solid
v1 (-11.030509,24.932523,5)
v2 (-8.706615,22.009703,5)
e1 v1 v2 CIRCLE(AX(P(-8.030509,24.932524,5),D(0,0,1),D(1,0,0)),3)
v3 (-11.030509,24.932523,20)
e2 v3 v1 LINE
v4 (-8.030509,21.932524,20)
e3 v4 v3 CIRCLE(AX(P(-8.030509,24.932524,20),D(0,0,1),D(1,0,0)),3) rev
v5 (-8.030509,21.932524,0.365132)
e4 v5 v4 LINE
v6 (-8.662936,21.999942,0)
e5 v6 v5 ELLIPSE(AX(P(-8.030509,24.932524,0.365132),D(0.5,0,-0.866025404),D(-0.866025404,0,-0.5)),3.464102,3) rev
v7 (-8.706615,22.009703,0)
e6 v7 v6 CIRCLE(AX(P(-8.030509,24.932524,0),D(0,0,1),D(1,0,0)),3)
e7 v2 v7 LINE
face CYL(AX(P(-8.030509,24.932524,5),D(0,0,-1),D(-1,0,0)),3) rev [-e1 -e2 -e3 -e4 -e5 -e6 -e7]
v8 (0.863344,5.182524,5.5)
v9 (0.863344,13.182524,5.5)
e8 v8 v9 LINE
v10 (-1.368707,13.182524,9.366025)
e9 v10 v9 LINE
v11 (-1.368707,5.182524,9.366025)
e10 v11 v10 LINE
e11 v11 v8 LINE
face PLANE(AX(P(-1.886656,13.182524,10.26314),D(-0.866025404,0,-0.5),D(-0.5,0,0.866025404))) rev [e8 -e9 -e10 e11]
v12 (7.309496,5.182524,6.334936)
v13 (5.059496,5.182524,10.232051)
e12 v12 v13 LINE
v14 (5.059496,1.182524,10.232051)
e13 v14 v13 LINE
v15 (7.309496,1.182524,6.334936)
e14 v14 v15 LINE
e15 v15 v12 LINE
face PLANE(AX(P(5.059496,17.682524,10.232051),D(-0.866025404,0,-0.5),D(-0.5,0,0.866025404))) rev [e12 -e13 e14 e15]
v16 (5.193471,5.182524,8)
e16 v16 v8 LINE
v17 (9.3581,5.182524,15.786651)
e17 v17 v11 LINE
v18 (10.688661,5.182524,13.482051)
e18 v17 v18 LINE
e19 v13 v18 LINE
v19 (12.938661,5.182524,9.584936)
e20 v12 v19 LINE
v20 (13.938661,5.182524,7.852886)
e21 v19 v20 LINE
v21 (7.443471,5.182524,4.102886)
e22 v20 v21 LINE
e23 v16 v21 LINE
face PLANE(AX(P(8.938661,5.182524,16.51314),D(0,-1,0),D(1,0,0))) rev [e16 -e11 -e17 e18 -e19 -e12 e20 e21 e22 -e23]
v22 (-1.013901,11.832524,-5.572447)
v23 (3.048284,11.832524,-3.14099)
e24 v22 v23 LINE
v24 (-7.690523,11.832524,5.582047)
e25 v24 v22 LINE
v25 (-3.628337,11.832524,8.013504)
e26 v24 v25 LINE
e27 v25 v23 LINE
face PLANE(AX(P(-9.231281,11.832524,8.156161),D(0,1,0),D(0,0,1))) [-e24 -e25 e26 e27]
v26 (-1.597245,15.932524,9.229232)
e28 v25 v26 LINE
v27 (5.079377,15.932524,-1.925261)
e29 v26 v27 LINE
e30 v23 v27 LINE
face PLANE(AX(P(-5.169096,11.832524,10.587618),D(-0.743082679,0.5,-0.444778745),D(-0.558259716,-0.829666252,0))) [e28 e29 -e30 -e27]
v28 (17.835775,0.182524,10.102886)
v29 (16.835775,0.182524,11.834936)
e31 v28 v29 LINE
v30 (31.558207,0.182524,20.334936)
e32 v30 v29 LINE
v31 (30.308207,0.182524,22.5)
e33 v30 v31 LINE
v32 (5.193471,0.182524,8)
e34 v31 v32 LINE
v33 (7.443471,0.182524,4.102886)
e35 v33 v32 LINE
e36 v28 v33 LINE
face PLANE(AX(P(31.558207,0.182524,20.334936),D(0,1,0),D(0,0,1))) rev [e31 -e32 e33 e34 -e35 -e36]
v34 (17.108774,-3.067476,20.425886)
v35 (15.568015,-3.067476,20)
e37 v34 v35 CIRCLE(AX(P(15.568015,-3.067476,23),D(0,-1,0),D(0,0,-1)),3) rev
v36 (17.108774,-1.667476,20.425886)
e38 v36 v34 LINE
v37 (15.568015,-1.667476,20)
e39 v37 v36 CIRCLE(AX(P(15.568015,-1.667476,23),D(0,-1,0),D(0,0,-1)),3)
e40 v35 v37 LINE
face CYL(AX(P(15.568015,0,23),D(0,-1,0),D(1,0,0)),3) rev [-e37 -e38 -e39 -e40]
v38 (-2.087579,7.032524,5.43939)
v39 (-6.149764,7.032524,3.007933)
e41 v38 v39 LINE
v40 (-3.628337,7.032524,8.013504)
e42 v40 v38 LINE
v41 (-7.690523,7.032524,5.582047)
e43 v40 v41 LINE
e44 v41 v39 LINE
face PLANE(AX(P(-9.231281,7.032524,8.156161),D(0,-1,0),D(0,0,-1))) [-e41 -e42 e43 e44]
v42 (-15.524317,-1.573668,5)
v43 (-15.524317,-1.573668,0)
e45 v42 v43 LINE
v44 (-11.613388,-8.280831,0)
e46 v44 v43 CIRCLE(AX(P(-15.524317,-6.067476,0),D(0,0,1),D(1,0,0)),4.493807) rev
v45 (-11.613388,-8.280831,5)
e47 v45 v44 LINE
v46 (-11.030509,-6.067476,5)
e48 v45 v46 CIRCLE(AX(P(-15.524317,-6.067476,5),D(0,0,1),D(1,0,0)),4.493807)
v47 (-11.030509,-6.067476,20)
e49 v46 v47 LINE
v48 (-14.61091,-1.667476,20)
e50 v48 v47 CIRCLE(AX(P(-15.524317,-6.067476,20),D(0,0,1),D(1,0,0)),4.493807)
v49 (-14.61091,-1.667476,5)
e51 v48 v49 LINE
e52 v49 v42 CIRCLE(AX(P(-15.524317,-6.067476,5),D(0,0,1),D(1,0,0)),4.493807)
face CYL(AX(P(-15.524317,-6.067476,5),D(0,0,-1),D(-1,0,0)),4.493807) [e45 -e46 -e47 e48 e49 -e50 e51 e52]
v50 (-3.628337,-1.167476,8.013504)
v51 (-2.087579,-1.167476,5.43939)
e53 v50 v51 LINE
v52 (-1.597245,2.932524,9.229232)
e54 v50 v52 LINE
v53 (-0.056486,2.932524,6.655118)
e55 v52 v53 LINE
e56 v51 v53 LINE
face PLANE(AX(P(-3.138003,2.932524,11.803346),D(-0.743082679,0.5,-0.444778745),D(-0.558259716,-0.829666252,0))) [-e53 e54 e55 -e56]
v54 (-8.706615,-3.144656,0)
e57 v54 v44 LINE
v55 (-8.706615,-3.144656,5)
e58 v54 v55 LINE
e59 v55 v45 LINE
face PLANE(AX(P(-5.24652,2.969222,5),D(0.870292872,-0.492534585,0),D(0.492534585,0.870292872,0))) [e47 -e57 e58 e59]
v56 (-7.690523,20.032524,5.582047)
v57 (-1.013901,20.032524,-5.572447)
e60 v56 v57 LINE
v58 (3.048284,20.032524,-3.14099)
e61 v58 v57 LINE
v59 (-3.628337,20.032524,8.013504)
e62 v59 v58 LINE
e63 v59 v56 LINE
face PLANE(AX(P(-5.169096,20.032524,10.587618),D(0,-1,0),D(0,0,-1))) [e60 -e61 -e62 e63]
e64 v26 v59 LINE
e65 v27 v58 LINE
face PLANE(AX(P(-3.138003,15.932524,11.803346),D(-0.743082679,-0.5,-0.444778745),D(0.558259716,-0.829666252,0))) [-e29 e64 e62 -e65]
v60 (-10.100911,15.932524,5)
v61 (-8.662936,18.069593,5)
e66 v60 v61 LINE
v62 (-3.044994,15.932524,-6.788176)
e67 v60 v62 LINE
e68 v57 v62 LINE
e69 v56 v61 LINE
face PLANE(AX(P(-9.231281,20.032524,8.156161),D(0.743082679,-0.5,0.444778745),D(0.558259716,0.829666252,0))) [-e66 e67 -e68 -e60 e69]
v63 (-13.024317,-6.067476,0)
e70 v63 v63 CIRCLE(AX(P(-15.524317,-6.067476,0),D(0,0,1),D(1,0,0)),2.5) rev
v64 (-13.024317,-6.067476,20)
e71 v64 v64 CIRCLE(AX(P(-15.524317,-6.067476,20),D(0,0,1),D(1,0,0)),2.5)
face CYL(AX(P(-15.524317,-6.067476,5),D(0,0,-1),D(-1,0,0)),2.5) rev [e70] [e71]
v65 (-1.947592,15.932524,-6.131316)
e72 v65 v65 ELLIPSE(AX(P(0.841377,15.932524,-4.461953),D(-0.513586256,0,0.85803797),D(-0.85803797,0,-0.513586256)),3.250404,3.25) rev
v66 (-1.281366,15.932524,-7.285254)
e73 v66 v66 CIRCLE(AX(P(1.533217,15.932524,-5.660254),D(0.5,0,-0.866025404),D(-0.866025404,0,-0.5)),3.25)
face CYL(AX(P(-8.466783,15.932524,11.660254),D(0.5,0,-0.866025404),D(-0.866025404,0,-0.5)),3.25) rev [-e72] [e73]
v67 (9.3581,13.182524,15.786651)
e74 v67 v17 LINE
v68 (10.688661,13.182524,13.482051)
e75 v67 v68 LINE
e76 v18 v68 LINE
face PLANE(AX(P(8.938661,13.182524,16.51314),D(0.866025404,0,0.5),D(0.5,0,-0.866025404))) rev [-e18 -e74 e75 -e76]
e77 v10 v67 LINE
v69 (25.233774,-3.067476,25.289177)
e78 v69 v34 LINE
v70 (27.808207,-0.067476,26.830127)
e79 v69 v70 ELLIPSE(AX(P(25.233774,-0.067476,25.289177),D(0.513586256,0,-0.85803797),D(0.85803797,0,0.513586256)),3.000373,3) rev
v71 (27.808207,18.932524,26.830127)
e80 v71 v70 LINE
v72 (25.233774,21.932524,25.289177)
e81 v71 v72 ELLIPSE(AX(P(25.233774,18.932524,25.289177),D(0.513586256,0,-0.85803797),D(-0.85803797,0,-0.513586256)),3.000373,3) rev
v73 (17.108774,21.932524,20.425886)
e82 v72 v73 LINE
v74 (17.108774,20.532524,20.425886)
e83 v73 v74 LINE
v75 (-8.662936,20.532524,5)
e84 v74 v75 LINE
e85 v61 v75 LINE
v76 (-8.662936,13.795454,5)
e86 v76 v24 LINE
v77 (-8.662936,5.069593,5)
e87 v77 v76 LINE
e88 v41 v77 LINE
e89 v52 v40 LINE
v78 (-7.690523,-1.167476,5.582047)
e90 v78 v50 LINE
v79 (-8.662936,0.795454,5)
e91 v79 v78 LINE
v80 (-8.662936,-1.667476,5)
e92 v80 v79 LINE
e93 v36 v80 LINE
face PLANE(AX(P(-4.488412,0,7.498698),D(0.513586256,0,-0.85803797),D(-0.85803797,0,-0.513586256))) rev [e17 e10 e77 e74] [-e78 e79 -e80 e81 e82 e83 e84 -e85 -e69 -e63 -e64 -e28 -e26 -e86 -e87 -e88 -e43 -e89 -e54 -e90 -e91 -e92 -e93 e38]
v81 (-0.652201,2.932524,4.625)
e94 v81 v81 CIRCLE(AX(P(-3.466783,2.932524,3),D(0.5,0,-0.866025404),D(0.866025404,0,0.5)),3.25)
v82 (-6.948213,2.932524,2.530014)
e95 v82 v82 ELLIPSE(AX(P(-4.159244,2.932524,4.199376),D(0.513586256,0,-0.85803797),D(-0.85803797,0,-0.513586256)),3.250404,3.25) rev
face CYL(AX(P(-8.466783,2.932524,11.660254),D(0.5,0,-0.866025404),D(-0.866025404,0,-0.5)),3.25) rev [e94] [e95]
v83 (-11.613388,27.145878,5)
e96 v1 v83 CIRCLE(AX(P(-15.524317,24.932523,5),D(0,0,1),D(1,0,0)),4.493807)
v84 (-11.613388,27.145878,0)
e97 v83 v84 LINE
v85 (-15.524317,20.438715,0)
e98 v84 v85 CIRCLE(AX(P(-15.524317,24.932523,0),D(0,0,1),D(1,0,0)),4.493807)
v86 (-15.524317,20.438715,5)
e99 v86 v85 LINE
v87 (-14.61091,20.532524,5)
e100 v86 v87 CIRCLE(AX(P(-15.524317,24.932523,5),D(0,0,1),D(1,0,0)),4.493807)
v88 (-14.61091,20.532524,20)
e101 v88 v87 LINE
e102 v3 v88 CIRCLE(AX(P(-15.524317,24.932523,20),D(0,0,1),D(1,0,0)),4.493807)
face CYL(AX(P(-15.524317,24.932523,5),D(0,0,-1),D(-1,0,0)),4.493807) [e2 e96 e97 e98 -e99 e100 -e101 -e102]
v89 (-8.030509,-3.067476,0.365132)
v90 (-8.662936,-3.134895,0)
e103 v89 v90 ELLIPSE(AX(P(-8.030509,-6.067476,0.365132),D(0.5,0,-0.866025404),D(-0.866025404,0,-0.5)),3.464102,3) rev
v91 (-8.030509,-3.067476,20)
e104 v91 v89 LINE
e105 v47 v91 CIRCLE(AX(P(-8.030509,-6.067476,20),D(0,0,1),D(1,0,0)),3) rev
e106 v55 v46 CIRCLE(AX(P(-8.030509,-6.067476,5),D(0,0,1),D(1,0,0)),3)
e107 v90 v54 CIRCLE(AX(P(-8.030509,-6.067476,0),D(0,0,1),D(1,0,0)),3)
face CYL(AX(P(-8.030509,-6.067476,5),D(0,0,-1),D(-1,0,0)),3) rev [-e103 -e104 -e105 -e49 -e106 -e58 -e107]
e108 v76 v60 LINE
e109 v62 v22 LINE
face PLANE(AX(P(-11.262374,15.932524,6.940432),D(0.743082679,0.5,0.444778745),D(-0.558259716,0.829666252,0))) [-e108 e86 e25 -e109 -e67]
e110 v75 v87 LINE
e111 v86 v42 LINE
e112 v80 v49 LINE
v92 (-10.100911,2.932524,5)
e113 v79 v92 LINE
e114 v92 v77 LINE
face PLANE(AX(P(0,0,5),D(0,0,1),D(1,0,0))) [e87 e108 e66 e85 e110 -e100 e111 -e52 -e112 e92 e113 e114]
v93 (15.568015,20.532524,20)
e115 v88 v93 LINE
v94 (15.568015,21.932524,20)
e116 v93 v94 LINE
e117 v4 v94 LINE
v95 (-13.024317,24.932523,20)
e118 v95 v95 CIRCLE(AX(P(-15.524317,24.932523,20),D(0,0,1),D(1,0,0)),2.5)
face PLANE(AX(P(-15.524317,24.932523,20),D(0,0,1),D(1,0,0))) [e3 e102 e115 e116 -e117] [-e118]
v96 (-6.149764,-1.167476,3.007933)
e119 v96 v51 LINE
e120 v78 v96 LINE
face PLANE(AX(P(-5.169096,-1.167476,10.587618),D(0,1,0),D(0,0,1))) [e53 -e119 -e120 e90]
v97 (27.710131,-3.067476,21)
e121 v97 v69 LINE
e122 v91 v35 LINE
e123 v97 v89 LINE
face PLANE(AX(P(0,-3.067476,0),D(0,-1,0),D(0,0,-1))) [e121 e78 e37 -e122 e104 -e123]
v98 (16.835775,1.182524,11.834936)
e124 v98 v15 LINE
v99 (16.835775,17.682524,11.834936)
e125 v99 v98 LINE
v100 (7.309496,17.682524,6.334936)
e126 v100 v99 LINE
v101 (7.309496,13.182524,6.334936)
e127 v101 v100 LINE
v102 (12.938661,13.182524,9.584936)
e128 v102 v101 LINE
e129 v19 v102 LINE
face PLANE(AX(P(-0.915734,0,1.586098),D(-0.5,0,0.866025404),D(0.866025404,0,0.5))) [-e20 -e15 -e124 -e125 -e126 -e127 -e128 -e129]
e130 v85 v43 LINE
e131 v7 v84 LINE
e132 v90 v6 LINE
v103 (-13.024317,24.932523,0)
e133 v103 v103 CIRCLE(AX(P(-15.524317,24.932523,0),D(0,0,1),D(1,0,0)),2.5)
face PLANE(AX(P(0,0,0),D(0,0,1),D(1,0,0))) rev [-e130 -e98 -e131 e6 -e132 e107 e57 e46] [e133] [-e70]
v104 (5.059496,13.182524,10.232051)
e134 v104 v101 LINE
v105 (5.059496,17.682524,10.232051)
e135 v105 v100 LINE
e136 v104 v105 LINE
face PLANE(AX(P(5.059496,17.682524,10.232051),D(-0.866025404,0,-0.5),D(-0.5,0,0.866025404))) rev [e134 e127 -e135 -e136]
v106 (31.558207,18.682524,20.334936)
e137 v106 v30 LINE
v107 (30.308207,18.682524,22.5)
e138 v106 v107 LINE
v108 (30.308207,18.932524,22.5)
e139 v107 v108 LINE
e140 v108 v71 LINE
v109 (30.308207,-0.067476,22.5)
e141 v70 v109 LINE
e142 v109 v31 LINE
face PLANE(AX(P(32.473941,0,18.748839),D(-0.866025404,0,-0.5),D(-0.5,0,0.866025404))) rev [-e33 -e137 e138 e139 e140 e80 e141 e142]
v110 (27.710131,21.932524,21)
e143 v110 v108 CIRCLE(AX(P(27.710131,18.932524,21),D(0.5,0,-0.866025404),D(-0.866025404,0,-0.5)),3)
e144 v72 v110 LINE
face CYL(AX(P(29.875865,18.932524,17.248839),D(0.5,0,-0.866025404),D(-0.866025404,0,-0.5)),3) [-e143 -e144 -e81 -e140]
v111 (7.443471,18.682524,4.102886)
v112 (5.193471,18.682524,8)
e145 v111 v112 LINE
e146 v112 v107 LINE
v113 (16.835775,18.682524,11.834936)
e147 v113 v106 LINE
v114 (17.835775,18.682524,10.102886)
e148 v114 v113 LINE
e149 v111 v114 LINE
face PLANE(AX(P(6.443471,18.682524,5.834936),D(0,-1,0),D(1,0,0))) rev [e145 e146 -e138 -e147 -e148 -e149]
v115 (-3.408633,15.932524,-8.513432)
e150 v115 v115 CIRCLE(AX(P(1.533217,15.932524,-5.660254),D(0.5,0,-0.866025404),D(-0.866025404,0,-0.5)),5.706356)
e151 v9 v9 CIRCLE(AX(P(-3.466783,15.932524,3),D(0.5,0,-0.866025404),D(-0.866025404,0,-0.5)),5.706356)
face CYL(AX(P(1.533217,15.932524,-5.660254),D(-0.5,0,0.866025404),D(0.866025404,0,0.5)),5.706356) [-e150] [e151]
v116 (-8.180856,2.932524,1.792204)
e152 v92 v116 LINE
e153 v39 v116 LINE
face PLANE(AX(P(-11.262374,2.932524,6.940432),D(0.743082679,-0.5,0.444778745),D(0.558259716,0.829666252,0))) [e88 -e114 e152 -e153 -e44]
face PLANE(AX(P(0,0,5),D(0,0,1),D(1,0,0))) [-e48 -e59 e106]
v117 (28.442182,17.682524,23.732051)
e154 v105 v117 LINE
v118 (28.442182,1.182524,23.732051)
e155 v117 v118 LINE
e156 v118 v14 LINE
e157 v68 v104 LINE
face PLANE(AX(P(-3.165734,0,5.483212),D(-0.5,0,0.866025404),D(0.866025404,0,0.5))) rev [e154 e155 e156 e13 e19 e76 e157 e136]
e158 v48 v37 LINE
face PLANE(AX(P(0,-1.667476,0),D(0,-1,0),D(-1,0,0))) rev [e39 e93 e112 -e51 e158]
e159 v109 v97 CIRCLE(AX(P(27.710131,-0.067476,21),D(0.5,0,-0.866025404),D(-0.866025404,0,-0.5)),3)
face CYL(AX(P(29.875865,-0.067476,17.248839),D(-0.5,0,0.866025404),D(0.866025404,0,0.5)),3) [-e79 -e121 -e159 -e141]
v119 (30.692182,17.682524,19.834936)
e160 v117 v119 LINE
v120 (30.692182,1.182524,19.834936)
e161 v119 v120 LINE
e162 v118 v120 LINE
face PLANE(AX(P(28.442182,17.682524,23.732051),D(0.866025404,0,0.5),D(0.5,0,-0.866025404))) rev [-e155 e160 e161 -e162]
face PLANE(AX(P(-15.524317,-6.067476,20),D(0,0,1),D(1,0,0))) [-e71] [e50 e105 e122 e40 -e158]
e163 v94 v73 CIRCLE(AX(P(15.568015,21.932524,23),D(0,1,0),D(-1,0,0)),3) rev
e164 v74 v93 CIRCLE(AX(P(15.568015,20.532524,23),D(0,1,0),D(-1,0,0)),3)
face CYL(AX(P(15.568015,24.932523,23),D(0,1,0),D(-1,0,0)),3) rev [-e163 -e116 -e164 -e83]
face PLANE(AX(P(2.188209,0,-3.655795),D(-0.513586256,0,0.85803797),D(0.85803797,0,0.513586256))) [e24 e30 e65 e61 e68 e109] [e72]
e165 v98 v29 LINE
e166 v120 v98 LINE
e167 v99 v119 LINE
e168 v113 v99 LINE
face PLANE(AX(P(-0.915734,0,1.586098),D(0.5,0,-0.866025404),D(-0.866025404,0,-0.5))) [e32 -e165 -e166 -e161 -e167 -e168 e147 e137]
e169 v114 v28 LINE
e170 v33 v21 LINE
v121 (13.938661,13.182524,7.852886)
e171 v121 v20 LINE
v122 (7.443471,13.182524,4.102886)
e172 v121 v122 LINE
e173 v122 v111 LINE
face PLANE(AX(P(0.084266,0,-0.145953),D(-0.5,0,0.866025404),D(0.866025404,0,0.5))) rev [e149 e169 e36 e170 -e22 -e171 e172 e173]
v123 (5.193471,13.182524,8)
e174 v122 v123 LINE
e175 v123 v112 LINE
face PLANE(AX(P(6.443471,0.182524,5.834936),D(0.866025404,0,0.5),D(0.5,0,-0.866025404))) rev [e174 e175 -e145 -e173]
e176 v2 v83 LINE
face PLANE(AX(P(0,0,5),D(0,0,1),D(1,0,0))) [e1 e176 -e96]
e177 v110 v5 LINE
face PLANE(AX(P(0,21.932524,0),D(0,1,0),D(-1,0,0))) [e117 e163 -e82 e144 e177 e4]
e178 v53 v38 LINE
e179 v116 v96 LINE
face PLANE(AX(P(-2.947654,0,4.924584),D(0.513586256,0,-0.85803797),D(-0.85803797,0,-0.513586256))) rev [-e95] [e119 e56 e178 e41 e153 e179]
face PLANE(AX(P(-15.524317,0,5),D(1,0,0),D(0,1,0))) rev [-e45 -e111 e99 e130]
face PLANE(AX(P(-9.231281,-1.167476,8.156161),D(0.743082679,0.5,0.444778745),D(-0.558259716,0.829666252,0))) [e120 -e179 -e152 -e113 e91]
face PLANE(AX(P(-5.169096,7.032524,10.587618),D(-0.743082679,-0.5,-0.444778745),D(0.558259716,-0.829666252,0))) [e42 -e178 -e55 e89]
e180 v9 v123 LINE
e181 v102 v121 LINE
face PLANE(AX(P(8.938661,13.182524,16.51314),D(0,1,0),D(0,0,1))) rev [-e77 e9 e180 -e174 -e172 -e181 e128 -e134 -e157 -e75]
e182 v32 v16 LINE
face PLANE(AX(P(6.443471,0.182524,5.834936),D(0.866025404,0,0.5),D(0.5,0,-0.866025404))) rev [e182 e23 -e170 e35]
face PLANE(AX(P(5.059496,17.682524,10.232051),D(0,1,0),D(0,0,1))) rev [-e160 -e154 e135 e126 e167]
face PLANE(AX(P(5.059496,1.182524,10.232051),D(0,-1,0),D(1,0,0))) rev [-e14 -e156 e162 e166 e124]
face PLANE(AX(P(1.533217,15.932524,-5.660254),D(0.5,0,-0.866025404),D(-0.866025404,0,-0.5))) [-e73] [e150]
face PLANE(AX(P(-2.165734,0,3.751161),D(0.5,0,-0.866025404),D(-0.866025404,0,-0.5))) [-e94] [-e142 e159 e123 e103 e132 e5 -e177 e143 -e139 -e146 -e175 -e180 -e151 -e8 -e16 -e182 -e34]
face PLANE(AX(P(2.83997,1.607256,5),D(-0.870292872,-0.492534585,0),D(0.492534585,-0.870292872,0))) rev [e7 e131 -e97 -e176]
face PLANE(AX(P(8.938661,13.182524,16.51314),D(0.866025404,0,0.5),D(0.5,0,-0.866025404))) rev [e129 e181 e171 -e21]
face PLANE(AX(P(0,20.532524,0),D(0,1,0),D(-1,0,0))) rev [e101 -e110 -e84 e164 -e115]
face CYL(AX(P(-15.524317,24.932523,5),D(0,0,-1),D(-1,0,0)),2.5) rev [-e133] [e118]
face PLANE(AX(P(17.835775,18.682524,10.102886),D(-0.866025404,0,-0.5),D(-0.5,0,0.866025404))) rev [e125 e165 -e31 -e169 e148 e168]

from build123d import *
from build123d.topology import SkipClean

# Parameters (mm, degrees)
CROQUIS3_R                 = 2.5
SALIENTE_EXTRUIR1_DEPTH    = 5
CROQUIS6_W                 = 27
CROQUIS6_H                 = 16.5
CORTAR_EXTRUIR1_DEPTH      = 2
CROQUIS7_W                 = 29
CROQUIS7_H                 = 18.5
CROQUIS7_W_2               = 27
CROQUIS7_H_2               = 16.5
SALIENTE_EXTRUIR2_DEPTH    = 2.5
CROQUIS8_W                 = 12
CROQUIS8_H                 = 18.5
SALIENTE_EXTRUIR3_DEPTH    = 2
CROQUIS9_W                 = 12.5
CROQUIS9_H                 = 8
CORTAR_EXTRUIR2_DEPTH      = 10
CROQUIS10_R                = 3.25
CORTAR_EXTRUIR3_DEPTH      = 10
CORTAR_EXTRUIR4_DEPTH      = 3
CORTAR_EXTRUIR4_DEPTH_BACK = 3
CROQUIS12_R                = 4.493807468
CROQUIS12_R_2              = 2.5
SALIENTE_EXTRUIR4_DEPTH    = 15
SALIENTE_EXTRUIR5_DEPTH    = 1.4
REDONDEO1_R                = 3
SALIENTE_EXTRUIR6_START    = 10
CROQUIS14_R                = 5.706356105
CROQUIS14_R_2              = 3.25
SALIENTE_EXTRUIR6_DEPTH    = 10
CORTAR_EXTRUIR5_DEPTH      = 10


with BuildPart() as part:
    # Croquis3 → Saliente-Extruir1 (new body)
    with BuildSketch(Plane.XY):
        with BuildLine():
            Line((-8.662935846, -3.067476434), (-11.613388129, -8.280831326))
            ThreePointArc((-11.613388129, -8.280831326), (-19.406371569, -8.331091381), (-15.524316735, -1.57366826))
            Line((-15.524316735, -1.57366826), (-15.524316735, 20.438715392))
            ThreePointArc((-15.524316735, 20.438715392), (-19.406371569, 27.196138513), (-11.613388129, 27.145878458))
            Line((-11.613388129, 27.145878458), (-8.662935846, 21.932523566))
            Line((-8.662935846, 21.932523566), (-8.662935846, -3.067476434))
        make_face()
        with Locations((-15.524316735, 24.93252286)):
            Circle(CROQUIS3_R, mode=Mode.SUBTRACT)
        with Locations((-15.524316735, -6.067475728)):
            Circle(CROQUIS3_R, mode=Mode.SUBTRACT)
    extrude(amount=SALIENTE_EXTRUIR1_DEPTH)

    # Croquis5 → section 0 of recubrir1
    with BuildSketch(Plane(origin=(32.473941286, 0, 18.748838743), x_dir=(0.5000000000000042, 0, -0.8660254037844363), z_dir=(0.8660254037844363, 0, 0.5000000000000042)), mode=Mode.PRIVATE) as recubrir1_s0:
        with BuildLine():
            Line((-4.331467923, 21.932523566), (-9.331467923, 21.932523566))
            Line((-9.331467923, 21.932523566), (-9.331467923, -3.067476434))
            Line((-9.331467923, -3.067476434), (-4.331467923, -3.067476434))
            Line((-4.331467923, -3.067476434), (-4.331467923, 21.932523566))
        make_face()
    # loft up to a face of the part (recubrir1)
    loft([recubrir1_s0.sketch, part.faces().sort_by_distance((-8.662935846, 9.432523566, 2.5))[0]])

    # Croquis6 → Cortar-Extruir1 (cut)
    with BuildSketch(Plane(origin=(-2.165733961, 0, 3.751161257), x_dir=(-0.8660254037844364, 0, -0.5000000000000041), z_dir=(0.500000000000004, 0, -0.8660254037844363))):
        with Locations((-22.997677486, 9.432523566)):
            Rectangle(CROQUIS6_W, CROQUIS6_H)
    extrude(amount=-CORTAR_EXTRUIR1_DEPTH, mode=Mode.SUBTRACT)

    # Croquis7 → Saliente-Extruir2 (add)
    with BuildSketch(Plane(origin=(-2.165733961, 0, 3.751161257), x_dir=(-0.8660254037844364, 0, -0.5000000000000041), z_dir=(0.500000000000004, 0, -0.8660254037844363))):
        with Locations((-22.997677486, 9.432523566)):
            Rectangle(CROQUIS7_W, CROQUIS7_H)
        with Locations((-22.997677486, 9.432523566)):
            Rectangle(CROQUIS7_W_2, CROQUIS7_H_2, mode=Mode.SUBTRACT)
    extrude(amount=SALIENTE_EXTRUIR2_DEPTH)

    # Croquis8 → Saliente-Extruir3 (add)
    with BuildSketch(Plane(origin=(-0.915733961, 0, 1.586097747), x_dir=(-0.8660254037844364, 0, -0.500000000000004), z_dir=(0.500000000000004, 0, -0.8660254037844365))):
        with Locations((-14.497677486, 9.432523566)):
            Rectangle(CROQUIS8_W, CROQUIS8_H)
    extrude(amount=SALIENTE_EXTRUIR3_DEPTH)

    # Croquis9 → Cortar-Extruir2 (cut)
    with BuildSketch(Plane(origin=(0.084266039, 0, -0.14595306), x_dir=(-0.8660254037844364, 0, -0.5000000000000041), z_dir=(0.500000000000004, 0, -0.8660254037844363))):
        with Locations((-9.747677486, 9.182523566)):
            Rectangle(CROQUIS9_W, CROQUIS9_H)
    extrude(amount=-CORTAR_EXTRUIR2_DEPTH, mode=Mode.SUBTRACT)

    # Croquis10 → Cortar-Extruir3 (cut)
    with BuildSketch(Plane(origin=(-2.165733961, 0, 3.751161257), x_dir=(-0.8660254037844364, 0, -0.5000000000000041), z_dir=(0.500000000000004, 0, -0.8660254037844363))):
        with Locations((1.502322514, 15.932523566)):
            Circle(CROQUIS10_R)
        with Locations((1.502322514, 2.932523566)):
            Circle(CROQUIS10_R)
    extrude(amount=-CORTAR_EXTRUIR3_DEPTH, mode=Mode.SUBTRACT)

    # Croquis11 → Cortar-Extruir4 (cut, two sides: drawn at the far end of the back side and taken through both)
    with BuildSketch(Plane(origin=(-4.488412426, 0, 7.498698109), x_dir=(0.8580379698740155, 0, 0.5135862559049632), z_dir=(-0.5135862559049631, 0, 0.8580379698740154)).offset(-CORTAR_EXTRUIR4_DEPTH_BACK)):
        Polygon((-6.099034085, 15.932523566), (-3.731897982, 11.832523566), (1.002374226, 11.832523566), (3.369510329, 15.932523566), (1.002374226, 20.032523566), (-3.731897982, 20.032523566), align=None)
        Polygon((-3.731897982, -1.167476434), (-6.099034085, 2.932523566), (-3.731897982, 7.032523566), (1.002374226, 7.032523566), (3.369510329, 2.932523566), (1.002374226, -1.167476434), align=None)
    extrude(amount=CORTAR_EXTRUIR4_DEPTH + CORTAR_EXTRUIR4_DEPTH_BACK, mode=Mode.SUBTRACT)

    # Croquis12 → Saliente-Extruir4 (add)
    # profile 1 of 2: a face of its own
    with SkipClean():  # the faces are left unmerged after this step: merging them gives an invalid solid
        with BuildSketch(Plane.XY.offset(5)):
            with Locations(Location((-15.524316735, -6.067475728, 0), (0, 0, 90))):
                Circle(CROQUIS12_R)
            with Locations((-15.524316735, -6.067475728)):
                Circle(CROQUIS12_R_2, mode=Mode.SUBTRACT)
        # profile 2 of 2: a face of its own
        with BuildSketch(Plane.XY.offset(5)):
            with Locations(Location((-15.524316735, 24.93252286, 0), (0, 0, 270))):
                Circle(CROQUIS12_R)
            with Locations((-15.524316735, 24.93252286)):
                Circle(CROQUIS12_R_2, mode=Mode.SUBTRACT)
        extrude(amount=SALIENTE_EXTRUIR4_DEPTH)

    # Croquis13 → Saliente-Extruir5 (add)
    with SkipClean():  # the faces are left unmerged after this step: merging them gives an invalid solid
        with BuildSketch(Plane(origin=(0, 21.932523566, 0), x_dir=(1, 0, 0), z_dir=(0, 1, 0))):
            Polygon((-8.662935846, -5), (16.397254921, -20), (-16.030509266, -20), (-16.030509266, -5), align=None)
        saliente_extruir5 = extrude(amount=-SALIENTE_EXTRUIR5_DEPTH)

    # Simetría1: Saliente-Extruir5 across plane
    with SkipClean():  # the faces are left unmerged after this step: merging them gives an invalid solid
        add(saliente_extruir5.mirror(Plane(origin=(0, 9.432523566, 0), x_dir=(0, 0, 1), z_dir=(0, -1, 0))))

    # Redondeo1
    # the kernel refuses this fillet: 3 mm, written as the material it adds along each edge
    with BuildSketch(Plane(origin=(16.397254921, 21.932523566, 20), x_dir=(0.8580379698740132, 0, 0.5135862559049668), z_dir=(0, -1, 0))) as redondeo1_piece_1:
        with BuildLine():
            CenterArc((REDONDEO1_R * 0.2764132188, REDONDEO1_R), REDONDEO1_R, 239.0969949, 30.9030051)
            Line((-REDONDEO1_R * 0.237173037105, REDONDEO1_R * 0.141962030126), (0, 0))
            Line((0, 0), (REDONDEO1_R * 0.2764132188, 0))
        make_face()
    extrude(amount=1.4)
    with BuildSketch(Plane(origin=(-12.178526873, 21.932523566, 20), x_dir=(0.357397896635504, 0.9339522169150398, 0), z_dir=(0, 0, -1))) as redondeo1_piece_2_section:
        with BuildLine():
            CenterArc((4.284349419, 2.80185655), REDONDEO1_R, 159.059522314, 89.999994603)
            Line((1.482492768, 3.87405024), (0, 0))
            ThreePointArc((0, 0), (1.606077732, 0.296806172), (3.212155465, 0))
        make_face()
    redondeo1_piece_2 = extrude(amount=25.370044017, mode=Mode.PRIVATE)
    redondeo1_piece_2 = split(redondeo1_piece_2, bisect_by=Plane(origin=(-10.732886495, 22.627434276, 0), z_dir=(0, 0, 1)), keep=Keep.TOP, mode=Mode.PRIVATE)
    redondeo1_piece_2 = split(redondeo1_piece_2, bisect_by=Plane(origin=(-4.802740059, 22.627434276, 2.228685076), z_dir=(-0.5000000000000042, 0, 0.8660254037844363)), keep=Keep.TOP, mode=Mode.PRIVATE)
    add(redondeo1_piece_2)
    with BuildSketch(Plane(origin=(16.397254921, -3.067476434, 20), x_dir=(0.8580379698740109, 0, 0.5135862559049705), z_dir=(0, 1, 0))) as redondeo1_piece_3:
        with BuildLine():
            CenterArc((REDONDEO1_R * 0.2764132188, -REDONDEO1_R), REDONDEO1_R, 90, 30.9030051)
            Line((-REDONDEO1_R * 0.237173037105, -REDONDEO1_R * 0.141962030126), (0, 0))
            Line((0, 0), (REDONDEO1_R * 0.2764132188, 0))
        make_face()
    extrude(amount=1.4)
    with BuildSketch(Plane(origin=(-12.178526873, -3.067476434, 20), x_dir=(1, 0, 0), z_dir=(0, 0, -1))) as redondeo1_piece_4_section:
        with BuildLine():
            CenterArc((4.148017607, 3), REDONDEO1_R, 180.000005397, 89.999994603)
            ThreePointArc((1.148017607, 2.999999717), (0.851211586, 1.393921957), (0, 0))
            Line((0, 0), (4.148017607, 0))
        make_face()
    redondeo1_piece_4 = extrude(amount=25.370044017, mode=Mode.PRIVATE)
    redondeo1_piece_4 = split(redondeo1_piece_4, bisect_by=Plane(origin=(-8.521402606, -3.090294966, 0), z_dir=(0, 0, 1)), keep=Keep.TOP, mode=Mode.PRIVATE)
    redondeo1_piece_4 = split(redondeo1_piece_4, bisect_by=Plane(origin=(-3.144127143, -3.090294966, 3.18628569), z_dir=(-0.5000000000000042, 0, 0.8660254037844363)), keep=Keep.TOP, mode=Mode.PRIVATE)
    add(redondeo1_piece_4)
    # the kernel refuses this fillet: 3 mm, written as the material it takes off along each edge
    with BuildSketch(Plane(origin=(34.058207325, 21.932523566, 16.004809472), x_dir=(0, -1, 0), z_dir=(-0.5000000000000042, 0, 0.8660254037844363))) as redondeo1_2_piece_1:
        with BuildLine():
            CenterArc((REDONDEO1_R, -REDONDEO1_R), REDONDEO1_R, 90, 90)
            Line((0, -REDONDEO1_R), (0, 0))
            Line((0, 0), (REDONDEO1_R, 0))
        make_face()
    extrude(amount=20, mode=Mode.SUBTRACT)
    with BuildSketch(Plane(origin=(24.058207325, -3.067476434, 33.325317547), x_dir=(-0.8660254037844363, 0, -0.5000000000000041), z_dir=(0.5000000000000042, 0, -0.8660254037844363))) as redondeo1_2_piece_2:
        with BuildLine():
            CenterArc((REDONDEO1_R, REDONDEO1_R), REDONDEO1_R, 180, 90)
            Line((0, REDONDEO1_R), (0, 0))
            Line((0, 0), (REDONDEO1_R, 0))
        make_face()
    extrude(amount=20, mode=Mode.SUBTRACT)

    # Croquis14 → Saliente-Extruir6 (add)
    with BuildSketch(Plane(origin=(-2.165733961, 0, 3.751161257), x_dir=(-0.8660254037844363, 0, -0.5000000000000042), z_dir=(0.5000000000000041, 0, -0.8660254037844362)).offset(SALIENTE_EXTRUIR6_START)):
        with Locations(Location((1.502322514, 15.932523566, 0), (0, 0, 208.810793743))):
            Circle(CROQUIS14_R)
        with Locations((1.502322514, 15.932523566)):
            Circle(CROQUIS14_R_2, mode=Mode.SUBTRACT)
    extrude(amount=-SALIENTE_EXTRUIR6_DEPTH)

    # Croquis15 → Cortar-Extruir5 (cut)
    with BuildSketch(Plane(origin=(-2.947653659, 0, 4.9245842), x_dir=(0.8580379698740153, 0, 0.5135862559049633), z_dir=(-0.5135862559049633, 0, 0.8580379698740153))):
        Polygon((3.369510329, 15.932523566), (1.002374226, 20.032523566), (-3.731897982, 20.032523566), (-6.099034085, 15.932523566), (-3.731897982, 11.832523566), (1.002374226, 11.832523566), align=None)
    extrude(amount=-CORTAR_EXTRUIR5_DEPTH, mode=Mode.SUBTRACT)


solid = part.part
